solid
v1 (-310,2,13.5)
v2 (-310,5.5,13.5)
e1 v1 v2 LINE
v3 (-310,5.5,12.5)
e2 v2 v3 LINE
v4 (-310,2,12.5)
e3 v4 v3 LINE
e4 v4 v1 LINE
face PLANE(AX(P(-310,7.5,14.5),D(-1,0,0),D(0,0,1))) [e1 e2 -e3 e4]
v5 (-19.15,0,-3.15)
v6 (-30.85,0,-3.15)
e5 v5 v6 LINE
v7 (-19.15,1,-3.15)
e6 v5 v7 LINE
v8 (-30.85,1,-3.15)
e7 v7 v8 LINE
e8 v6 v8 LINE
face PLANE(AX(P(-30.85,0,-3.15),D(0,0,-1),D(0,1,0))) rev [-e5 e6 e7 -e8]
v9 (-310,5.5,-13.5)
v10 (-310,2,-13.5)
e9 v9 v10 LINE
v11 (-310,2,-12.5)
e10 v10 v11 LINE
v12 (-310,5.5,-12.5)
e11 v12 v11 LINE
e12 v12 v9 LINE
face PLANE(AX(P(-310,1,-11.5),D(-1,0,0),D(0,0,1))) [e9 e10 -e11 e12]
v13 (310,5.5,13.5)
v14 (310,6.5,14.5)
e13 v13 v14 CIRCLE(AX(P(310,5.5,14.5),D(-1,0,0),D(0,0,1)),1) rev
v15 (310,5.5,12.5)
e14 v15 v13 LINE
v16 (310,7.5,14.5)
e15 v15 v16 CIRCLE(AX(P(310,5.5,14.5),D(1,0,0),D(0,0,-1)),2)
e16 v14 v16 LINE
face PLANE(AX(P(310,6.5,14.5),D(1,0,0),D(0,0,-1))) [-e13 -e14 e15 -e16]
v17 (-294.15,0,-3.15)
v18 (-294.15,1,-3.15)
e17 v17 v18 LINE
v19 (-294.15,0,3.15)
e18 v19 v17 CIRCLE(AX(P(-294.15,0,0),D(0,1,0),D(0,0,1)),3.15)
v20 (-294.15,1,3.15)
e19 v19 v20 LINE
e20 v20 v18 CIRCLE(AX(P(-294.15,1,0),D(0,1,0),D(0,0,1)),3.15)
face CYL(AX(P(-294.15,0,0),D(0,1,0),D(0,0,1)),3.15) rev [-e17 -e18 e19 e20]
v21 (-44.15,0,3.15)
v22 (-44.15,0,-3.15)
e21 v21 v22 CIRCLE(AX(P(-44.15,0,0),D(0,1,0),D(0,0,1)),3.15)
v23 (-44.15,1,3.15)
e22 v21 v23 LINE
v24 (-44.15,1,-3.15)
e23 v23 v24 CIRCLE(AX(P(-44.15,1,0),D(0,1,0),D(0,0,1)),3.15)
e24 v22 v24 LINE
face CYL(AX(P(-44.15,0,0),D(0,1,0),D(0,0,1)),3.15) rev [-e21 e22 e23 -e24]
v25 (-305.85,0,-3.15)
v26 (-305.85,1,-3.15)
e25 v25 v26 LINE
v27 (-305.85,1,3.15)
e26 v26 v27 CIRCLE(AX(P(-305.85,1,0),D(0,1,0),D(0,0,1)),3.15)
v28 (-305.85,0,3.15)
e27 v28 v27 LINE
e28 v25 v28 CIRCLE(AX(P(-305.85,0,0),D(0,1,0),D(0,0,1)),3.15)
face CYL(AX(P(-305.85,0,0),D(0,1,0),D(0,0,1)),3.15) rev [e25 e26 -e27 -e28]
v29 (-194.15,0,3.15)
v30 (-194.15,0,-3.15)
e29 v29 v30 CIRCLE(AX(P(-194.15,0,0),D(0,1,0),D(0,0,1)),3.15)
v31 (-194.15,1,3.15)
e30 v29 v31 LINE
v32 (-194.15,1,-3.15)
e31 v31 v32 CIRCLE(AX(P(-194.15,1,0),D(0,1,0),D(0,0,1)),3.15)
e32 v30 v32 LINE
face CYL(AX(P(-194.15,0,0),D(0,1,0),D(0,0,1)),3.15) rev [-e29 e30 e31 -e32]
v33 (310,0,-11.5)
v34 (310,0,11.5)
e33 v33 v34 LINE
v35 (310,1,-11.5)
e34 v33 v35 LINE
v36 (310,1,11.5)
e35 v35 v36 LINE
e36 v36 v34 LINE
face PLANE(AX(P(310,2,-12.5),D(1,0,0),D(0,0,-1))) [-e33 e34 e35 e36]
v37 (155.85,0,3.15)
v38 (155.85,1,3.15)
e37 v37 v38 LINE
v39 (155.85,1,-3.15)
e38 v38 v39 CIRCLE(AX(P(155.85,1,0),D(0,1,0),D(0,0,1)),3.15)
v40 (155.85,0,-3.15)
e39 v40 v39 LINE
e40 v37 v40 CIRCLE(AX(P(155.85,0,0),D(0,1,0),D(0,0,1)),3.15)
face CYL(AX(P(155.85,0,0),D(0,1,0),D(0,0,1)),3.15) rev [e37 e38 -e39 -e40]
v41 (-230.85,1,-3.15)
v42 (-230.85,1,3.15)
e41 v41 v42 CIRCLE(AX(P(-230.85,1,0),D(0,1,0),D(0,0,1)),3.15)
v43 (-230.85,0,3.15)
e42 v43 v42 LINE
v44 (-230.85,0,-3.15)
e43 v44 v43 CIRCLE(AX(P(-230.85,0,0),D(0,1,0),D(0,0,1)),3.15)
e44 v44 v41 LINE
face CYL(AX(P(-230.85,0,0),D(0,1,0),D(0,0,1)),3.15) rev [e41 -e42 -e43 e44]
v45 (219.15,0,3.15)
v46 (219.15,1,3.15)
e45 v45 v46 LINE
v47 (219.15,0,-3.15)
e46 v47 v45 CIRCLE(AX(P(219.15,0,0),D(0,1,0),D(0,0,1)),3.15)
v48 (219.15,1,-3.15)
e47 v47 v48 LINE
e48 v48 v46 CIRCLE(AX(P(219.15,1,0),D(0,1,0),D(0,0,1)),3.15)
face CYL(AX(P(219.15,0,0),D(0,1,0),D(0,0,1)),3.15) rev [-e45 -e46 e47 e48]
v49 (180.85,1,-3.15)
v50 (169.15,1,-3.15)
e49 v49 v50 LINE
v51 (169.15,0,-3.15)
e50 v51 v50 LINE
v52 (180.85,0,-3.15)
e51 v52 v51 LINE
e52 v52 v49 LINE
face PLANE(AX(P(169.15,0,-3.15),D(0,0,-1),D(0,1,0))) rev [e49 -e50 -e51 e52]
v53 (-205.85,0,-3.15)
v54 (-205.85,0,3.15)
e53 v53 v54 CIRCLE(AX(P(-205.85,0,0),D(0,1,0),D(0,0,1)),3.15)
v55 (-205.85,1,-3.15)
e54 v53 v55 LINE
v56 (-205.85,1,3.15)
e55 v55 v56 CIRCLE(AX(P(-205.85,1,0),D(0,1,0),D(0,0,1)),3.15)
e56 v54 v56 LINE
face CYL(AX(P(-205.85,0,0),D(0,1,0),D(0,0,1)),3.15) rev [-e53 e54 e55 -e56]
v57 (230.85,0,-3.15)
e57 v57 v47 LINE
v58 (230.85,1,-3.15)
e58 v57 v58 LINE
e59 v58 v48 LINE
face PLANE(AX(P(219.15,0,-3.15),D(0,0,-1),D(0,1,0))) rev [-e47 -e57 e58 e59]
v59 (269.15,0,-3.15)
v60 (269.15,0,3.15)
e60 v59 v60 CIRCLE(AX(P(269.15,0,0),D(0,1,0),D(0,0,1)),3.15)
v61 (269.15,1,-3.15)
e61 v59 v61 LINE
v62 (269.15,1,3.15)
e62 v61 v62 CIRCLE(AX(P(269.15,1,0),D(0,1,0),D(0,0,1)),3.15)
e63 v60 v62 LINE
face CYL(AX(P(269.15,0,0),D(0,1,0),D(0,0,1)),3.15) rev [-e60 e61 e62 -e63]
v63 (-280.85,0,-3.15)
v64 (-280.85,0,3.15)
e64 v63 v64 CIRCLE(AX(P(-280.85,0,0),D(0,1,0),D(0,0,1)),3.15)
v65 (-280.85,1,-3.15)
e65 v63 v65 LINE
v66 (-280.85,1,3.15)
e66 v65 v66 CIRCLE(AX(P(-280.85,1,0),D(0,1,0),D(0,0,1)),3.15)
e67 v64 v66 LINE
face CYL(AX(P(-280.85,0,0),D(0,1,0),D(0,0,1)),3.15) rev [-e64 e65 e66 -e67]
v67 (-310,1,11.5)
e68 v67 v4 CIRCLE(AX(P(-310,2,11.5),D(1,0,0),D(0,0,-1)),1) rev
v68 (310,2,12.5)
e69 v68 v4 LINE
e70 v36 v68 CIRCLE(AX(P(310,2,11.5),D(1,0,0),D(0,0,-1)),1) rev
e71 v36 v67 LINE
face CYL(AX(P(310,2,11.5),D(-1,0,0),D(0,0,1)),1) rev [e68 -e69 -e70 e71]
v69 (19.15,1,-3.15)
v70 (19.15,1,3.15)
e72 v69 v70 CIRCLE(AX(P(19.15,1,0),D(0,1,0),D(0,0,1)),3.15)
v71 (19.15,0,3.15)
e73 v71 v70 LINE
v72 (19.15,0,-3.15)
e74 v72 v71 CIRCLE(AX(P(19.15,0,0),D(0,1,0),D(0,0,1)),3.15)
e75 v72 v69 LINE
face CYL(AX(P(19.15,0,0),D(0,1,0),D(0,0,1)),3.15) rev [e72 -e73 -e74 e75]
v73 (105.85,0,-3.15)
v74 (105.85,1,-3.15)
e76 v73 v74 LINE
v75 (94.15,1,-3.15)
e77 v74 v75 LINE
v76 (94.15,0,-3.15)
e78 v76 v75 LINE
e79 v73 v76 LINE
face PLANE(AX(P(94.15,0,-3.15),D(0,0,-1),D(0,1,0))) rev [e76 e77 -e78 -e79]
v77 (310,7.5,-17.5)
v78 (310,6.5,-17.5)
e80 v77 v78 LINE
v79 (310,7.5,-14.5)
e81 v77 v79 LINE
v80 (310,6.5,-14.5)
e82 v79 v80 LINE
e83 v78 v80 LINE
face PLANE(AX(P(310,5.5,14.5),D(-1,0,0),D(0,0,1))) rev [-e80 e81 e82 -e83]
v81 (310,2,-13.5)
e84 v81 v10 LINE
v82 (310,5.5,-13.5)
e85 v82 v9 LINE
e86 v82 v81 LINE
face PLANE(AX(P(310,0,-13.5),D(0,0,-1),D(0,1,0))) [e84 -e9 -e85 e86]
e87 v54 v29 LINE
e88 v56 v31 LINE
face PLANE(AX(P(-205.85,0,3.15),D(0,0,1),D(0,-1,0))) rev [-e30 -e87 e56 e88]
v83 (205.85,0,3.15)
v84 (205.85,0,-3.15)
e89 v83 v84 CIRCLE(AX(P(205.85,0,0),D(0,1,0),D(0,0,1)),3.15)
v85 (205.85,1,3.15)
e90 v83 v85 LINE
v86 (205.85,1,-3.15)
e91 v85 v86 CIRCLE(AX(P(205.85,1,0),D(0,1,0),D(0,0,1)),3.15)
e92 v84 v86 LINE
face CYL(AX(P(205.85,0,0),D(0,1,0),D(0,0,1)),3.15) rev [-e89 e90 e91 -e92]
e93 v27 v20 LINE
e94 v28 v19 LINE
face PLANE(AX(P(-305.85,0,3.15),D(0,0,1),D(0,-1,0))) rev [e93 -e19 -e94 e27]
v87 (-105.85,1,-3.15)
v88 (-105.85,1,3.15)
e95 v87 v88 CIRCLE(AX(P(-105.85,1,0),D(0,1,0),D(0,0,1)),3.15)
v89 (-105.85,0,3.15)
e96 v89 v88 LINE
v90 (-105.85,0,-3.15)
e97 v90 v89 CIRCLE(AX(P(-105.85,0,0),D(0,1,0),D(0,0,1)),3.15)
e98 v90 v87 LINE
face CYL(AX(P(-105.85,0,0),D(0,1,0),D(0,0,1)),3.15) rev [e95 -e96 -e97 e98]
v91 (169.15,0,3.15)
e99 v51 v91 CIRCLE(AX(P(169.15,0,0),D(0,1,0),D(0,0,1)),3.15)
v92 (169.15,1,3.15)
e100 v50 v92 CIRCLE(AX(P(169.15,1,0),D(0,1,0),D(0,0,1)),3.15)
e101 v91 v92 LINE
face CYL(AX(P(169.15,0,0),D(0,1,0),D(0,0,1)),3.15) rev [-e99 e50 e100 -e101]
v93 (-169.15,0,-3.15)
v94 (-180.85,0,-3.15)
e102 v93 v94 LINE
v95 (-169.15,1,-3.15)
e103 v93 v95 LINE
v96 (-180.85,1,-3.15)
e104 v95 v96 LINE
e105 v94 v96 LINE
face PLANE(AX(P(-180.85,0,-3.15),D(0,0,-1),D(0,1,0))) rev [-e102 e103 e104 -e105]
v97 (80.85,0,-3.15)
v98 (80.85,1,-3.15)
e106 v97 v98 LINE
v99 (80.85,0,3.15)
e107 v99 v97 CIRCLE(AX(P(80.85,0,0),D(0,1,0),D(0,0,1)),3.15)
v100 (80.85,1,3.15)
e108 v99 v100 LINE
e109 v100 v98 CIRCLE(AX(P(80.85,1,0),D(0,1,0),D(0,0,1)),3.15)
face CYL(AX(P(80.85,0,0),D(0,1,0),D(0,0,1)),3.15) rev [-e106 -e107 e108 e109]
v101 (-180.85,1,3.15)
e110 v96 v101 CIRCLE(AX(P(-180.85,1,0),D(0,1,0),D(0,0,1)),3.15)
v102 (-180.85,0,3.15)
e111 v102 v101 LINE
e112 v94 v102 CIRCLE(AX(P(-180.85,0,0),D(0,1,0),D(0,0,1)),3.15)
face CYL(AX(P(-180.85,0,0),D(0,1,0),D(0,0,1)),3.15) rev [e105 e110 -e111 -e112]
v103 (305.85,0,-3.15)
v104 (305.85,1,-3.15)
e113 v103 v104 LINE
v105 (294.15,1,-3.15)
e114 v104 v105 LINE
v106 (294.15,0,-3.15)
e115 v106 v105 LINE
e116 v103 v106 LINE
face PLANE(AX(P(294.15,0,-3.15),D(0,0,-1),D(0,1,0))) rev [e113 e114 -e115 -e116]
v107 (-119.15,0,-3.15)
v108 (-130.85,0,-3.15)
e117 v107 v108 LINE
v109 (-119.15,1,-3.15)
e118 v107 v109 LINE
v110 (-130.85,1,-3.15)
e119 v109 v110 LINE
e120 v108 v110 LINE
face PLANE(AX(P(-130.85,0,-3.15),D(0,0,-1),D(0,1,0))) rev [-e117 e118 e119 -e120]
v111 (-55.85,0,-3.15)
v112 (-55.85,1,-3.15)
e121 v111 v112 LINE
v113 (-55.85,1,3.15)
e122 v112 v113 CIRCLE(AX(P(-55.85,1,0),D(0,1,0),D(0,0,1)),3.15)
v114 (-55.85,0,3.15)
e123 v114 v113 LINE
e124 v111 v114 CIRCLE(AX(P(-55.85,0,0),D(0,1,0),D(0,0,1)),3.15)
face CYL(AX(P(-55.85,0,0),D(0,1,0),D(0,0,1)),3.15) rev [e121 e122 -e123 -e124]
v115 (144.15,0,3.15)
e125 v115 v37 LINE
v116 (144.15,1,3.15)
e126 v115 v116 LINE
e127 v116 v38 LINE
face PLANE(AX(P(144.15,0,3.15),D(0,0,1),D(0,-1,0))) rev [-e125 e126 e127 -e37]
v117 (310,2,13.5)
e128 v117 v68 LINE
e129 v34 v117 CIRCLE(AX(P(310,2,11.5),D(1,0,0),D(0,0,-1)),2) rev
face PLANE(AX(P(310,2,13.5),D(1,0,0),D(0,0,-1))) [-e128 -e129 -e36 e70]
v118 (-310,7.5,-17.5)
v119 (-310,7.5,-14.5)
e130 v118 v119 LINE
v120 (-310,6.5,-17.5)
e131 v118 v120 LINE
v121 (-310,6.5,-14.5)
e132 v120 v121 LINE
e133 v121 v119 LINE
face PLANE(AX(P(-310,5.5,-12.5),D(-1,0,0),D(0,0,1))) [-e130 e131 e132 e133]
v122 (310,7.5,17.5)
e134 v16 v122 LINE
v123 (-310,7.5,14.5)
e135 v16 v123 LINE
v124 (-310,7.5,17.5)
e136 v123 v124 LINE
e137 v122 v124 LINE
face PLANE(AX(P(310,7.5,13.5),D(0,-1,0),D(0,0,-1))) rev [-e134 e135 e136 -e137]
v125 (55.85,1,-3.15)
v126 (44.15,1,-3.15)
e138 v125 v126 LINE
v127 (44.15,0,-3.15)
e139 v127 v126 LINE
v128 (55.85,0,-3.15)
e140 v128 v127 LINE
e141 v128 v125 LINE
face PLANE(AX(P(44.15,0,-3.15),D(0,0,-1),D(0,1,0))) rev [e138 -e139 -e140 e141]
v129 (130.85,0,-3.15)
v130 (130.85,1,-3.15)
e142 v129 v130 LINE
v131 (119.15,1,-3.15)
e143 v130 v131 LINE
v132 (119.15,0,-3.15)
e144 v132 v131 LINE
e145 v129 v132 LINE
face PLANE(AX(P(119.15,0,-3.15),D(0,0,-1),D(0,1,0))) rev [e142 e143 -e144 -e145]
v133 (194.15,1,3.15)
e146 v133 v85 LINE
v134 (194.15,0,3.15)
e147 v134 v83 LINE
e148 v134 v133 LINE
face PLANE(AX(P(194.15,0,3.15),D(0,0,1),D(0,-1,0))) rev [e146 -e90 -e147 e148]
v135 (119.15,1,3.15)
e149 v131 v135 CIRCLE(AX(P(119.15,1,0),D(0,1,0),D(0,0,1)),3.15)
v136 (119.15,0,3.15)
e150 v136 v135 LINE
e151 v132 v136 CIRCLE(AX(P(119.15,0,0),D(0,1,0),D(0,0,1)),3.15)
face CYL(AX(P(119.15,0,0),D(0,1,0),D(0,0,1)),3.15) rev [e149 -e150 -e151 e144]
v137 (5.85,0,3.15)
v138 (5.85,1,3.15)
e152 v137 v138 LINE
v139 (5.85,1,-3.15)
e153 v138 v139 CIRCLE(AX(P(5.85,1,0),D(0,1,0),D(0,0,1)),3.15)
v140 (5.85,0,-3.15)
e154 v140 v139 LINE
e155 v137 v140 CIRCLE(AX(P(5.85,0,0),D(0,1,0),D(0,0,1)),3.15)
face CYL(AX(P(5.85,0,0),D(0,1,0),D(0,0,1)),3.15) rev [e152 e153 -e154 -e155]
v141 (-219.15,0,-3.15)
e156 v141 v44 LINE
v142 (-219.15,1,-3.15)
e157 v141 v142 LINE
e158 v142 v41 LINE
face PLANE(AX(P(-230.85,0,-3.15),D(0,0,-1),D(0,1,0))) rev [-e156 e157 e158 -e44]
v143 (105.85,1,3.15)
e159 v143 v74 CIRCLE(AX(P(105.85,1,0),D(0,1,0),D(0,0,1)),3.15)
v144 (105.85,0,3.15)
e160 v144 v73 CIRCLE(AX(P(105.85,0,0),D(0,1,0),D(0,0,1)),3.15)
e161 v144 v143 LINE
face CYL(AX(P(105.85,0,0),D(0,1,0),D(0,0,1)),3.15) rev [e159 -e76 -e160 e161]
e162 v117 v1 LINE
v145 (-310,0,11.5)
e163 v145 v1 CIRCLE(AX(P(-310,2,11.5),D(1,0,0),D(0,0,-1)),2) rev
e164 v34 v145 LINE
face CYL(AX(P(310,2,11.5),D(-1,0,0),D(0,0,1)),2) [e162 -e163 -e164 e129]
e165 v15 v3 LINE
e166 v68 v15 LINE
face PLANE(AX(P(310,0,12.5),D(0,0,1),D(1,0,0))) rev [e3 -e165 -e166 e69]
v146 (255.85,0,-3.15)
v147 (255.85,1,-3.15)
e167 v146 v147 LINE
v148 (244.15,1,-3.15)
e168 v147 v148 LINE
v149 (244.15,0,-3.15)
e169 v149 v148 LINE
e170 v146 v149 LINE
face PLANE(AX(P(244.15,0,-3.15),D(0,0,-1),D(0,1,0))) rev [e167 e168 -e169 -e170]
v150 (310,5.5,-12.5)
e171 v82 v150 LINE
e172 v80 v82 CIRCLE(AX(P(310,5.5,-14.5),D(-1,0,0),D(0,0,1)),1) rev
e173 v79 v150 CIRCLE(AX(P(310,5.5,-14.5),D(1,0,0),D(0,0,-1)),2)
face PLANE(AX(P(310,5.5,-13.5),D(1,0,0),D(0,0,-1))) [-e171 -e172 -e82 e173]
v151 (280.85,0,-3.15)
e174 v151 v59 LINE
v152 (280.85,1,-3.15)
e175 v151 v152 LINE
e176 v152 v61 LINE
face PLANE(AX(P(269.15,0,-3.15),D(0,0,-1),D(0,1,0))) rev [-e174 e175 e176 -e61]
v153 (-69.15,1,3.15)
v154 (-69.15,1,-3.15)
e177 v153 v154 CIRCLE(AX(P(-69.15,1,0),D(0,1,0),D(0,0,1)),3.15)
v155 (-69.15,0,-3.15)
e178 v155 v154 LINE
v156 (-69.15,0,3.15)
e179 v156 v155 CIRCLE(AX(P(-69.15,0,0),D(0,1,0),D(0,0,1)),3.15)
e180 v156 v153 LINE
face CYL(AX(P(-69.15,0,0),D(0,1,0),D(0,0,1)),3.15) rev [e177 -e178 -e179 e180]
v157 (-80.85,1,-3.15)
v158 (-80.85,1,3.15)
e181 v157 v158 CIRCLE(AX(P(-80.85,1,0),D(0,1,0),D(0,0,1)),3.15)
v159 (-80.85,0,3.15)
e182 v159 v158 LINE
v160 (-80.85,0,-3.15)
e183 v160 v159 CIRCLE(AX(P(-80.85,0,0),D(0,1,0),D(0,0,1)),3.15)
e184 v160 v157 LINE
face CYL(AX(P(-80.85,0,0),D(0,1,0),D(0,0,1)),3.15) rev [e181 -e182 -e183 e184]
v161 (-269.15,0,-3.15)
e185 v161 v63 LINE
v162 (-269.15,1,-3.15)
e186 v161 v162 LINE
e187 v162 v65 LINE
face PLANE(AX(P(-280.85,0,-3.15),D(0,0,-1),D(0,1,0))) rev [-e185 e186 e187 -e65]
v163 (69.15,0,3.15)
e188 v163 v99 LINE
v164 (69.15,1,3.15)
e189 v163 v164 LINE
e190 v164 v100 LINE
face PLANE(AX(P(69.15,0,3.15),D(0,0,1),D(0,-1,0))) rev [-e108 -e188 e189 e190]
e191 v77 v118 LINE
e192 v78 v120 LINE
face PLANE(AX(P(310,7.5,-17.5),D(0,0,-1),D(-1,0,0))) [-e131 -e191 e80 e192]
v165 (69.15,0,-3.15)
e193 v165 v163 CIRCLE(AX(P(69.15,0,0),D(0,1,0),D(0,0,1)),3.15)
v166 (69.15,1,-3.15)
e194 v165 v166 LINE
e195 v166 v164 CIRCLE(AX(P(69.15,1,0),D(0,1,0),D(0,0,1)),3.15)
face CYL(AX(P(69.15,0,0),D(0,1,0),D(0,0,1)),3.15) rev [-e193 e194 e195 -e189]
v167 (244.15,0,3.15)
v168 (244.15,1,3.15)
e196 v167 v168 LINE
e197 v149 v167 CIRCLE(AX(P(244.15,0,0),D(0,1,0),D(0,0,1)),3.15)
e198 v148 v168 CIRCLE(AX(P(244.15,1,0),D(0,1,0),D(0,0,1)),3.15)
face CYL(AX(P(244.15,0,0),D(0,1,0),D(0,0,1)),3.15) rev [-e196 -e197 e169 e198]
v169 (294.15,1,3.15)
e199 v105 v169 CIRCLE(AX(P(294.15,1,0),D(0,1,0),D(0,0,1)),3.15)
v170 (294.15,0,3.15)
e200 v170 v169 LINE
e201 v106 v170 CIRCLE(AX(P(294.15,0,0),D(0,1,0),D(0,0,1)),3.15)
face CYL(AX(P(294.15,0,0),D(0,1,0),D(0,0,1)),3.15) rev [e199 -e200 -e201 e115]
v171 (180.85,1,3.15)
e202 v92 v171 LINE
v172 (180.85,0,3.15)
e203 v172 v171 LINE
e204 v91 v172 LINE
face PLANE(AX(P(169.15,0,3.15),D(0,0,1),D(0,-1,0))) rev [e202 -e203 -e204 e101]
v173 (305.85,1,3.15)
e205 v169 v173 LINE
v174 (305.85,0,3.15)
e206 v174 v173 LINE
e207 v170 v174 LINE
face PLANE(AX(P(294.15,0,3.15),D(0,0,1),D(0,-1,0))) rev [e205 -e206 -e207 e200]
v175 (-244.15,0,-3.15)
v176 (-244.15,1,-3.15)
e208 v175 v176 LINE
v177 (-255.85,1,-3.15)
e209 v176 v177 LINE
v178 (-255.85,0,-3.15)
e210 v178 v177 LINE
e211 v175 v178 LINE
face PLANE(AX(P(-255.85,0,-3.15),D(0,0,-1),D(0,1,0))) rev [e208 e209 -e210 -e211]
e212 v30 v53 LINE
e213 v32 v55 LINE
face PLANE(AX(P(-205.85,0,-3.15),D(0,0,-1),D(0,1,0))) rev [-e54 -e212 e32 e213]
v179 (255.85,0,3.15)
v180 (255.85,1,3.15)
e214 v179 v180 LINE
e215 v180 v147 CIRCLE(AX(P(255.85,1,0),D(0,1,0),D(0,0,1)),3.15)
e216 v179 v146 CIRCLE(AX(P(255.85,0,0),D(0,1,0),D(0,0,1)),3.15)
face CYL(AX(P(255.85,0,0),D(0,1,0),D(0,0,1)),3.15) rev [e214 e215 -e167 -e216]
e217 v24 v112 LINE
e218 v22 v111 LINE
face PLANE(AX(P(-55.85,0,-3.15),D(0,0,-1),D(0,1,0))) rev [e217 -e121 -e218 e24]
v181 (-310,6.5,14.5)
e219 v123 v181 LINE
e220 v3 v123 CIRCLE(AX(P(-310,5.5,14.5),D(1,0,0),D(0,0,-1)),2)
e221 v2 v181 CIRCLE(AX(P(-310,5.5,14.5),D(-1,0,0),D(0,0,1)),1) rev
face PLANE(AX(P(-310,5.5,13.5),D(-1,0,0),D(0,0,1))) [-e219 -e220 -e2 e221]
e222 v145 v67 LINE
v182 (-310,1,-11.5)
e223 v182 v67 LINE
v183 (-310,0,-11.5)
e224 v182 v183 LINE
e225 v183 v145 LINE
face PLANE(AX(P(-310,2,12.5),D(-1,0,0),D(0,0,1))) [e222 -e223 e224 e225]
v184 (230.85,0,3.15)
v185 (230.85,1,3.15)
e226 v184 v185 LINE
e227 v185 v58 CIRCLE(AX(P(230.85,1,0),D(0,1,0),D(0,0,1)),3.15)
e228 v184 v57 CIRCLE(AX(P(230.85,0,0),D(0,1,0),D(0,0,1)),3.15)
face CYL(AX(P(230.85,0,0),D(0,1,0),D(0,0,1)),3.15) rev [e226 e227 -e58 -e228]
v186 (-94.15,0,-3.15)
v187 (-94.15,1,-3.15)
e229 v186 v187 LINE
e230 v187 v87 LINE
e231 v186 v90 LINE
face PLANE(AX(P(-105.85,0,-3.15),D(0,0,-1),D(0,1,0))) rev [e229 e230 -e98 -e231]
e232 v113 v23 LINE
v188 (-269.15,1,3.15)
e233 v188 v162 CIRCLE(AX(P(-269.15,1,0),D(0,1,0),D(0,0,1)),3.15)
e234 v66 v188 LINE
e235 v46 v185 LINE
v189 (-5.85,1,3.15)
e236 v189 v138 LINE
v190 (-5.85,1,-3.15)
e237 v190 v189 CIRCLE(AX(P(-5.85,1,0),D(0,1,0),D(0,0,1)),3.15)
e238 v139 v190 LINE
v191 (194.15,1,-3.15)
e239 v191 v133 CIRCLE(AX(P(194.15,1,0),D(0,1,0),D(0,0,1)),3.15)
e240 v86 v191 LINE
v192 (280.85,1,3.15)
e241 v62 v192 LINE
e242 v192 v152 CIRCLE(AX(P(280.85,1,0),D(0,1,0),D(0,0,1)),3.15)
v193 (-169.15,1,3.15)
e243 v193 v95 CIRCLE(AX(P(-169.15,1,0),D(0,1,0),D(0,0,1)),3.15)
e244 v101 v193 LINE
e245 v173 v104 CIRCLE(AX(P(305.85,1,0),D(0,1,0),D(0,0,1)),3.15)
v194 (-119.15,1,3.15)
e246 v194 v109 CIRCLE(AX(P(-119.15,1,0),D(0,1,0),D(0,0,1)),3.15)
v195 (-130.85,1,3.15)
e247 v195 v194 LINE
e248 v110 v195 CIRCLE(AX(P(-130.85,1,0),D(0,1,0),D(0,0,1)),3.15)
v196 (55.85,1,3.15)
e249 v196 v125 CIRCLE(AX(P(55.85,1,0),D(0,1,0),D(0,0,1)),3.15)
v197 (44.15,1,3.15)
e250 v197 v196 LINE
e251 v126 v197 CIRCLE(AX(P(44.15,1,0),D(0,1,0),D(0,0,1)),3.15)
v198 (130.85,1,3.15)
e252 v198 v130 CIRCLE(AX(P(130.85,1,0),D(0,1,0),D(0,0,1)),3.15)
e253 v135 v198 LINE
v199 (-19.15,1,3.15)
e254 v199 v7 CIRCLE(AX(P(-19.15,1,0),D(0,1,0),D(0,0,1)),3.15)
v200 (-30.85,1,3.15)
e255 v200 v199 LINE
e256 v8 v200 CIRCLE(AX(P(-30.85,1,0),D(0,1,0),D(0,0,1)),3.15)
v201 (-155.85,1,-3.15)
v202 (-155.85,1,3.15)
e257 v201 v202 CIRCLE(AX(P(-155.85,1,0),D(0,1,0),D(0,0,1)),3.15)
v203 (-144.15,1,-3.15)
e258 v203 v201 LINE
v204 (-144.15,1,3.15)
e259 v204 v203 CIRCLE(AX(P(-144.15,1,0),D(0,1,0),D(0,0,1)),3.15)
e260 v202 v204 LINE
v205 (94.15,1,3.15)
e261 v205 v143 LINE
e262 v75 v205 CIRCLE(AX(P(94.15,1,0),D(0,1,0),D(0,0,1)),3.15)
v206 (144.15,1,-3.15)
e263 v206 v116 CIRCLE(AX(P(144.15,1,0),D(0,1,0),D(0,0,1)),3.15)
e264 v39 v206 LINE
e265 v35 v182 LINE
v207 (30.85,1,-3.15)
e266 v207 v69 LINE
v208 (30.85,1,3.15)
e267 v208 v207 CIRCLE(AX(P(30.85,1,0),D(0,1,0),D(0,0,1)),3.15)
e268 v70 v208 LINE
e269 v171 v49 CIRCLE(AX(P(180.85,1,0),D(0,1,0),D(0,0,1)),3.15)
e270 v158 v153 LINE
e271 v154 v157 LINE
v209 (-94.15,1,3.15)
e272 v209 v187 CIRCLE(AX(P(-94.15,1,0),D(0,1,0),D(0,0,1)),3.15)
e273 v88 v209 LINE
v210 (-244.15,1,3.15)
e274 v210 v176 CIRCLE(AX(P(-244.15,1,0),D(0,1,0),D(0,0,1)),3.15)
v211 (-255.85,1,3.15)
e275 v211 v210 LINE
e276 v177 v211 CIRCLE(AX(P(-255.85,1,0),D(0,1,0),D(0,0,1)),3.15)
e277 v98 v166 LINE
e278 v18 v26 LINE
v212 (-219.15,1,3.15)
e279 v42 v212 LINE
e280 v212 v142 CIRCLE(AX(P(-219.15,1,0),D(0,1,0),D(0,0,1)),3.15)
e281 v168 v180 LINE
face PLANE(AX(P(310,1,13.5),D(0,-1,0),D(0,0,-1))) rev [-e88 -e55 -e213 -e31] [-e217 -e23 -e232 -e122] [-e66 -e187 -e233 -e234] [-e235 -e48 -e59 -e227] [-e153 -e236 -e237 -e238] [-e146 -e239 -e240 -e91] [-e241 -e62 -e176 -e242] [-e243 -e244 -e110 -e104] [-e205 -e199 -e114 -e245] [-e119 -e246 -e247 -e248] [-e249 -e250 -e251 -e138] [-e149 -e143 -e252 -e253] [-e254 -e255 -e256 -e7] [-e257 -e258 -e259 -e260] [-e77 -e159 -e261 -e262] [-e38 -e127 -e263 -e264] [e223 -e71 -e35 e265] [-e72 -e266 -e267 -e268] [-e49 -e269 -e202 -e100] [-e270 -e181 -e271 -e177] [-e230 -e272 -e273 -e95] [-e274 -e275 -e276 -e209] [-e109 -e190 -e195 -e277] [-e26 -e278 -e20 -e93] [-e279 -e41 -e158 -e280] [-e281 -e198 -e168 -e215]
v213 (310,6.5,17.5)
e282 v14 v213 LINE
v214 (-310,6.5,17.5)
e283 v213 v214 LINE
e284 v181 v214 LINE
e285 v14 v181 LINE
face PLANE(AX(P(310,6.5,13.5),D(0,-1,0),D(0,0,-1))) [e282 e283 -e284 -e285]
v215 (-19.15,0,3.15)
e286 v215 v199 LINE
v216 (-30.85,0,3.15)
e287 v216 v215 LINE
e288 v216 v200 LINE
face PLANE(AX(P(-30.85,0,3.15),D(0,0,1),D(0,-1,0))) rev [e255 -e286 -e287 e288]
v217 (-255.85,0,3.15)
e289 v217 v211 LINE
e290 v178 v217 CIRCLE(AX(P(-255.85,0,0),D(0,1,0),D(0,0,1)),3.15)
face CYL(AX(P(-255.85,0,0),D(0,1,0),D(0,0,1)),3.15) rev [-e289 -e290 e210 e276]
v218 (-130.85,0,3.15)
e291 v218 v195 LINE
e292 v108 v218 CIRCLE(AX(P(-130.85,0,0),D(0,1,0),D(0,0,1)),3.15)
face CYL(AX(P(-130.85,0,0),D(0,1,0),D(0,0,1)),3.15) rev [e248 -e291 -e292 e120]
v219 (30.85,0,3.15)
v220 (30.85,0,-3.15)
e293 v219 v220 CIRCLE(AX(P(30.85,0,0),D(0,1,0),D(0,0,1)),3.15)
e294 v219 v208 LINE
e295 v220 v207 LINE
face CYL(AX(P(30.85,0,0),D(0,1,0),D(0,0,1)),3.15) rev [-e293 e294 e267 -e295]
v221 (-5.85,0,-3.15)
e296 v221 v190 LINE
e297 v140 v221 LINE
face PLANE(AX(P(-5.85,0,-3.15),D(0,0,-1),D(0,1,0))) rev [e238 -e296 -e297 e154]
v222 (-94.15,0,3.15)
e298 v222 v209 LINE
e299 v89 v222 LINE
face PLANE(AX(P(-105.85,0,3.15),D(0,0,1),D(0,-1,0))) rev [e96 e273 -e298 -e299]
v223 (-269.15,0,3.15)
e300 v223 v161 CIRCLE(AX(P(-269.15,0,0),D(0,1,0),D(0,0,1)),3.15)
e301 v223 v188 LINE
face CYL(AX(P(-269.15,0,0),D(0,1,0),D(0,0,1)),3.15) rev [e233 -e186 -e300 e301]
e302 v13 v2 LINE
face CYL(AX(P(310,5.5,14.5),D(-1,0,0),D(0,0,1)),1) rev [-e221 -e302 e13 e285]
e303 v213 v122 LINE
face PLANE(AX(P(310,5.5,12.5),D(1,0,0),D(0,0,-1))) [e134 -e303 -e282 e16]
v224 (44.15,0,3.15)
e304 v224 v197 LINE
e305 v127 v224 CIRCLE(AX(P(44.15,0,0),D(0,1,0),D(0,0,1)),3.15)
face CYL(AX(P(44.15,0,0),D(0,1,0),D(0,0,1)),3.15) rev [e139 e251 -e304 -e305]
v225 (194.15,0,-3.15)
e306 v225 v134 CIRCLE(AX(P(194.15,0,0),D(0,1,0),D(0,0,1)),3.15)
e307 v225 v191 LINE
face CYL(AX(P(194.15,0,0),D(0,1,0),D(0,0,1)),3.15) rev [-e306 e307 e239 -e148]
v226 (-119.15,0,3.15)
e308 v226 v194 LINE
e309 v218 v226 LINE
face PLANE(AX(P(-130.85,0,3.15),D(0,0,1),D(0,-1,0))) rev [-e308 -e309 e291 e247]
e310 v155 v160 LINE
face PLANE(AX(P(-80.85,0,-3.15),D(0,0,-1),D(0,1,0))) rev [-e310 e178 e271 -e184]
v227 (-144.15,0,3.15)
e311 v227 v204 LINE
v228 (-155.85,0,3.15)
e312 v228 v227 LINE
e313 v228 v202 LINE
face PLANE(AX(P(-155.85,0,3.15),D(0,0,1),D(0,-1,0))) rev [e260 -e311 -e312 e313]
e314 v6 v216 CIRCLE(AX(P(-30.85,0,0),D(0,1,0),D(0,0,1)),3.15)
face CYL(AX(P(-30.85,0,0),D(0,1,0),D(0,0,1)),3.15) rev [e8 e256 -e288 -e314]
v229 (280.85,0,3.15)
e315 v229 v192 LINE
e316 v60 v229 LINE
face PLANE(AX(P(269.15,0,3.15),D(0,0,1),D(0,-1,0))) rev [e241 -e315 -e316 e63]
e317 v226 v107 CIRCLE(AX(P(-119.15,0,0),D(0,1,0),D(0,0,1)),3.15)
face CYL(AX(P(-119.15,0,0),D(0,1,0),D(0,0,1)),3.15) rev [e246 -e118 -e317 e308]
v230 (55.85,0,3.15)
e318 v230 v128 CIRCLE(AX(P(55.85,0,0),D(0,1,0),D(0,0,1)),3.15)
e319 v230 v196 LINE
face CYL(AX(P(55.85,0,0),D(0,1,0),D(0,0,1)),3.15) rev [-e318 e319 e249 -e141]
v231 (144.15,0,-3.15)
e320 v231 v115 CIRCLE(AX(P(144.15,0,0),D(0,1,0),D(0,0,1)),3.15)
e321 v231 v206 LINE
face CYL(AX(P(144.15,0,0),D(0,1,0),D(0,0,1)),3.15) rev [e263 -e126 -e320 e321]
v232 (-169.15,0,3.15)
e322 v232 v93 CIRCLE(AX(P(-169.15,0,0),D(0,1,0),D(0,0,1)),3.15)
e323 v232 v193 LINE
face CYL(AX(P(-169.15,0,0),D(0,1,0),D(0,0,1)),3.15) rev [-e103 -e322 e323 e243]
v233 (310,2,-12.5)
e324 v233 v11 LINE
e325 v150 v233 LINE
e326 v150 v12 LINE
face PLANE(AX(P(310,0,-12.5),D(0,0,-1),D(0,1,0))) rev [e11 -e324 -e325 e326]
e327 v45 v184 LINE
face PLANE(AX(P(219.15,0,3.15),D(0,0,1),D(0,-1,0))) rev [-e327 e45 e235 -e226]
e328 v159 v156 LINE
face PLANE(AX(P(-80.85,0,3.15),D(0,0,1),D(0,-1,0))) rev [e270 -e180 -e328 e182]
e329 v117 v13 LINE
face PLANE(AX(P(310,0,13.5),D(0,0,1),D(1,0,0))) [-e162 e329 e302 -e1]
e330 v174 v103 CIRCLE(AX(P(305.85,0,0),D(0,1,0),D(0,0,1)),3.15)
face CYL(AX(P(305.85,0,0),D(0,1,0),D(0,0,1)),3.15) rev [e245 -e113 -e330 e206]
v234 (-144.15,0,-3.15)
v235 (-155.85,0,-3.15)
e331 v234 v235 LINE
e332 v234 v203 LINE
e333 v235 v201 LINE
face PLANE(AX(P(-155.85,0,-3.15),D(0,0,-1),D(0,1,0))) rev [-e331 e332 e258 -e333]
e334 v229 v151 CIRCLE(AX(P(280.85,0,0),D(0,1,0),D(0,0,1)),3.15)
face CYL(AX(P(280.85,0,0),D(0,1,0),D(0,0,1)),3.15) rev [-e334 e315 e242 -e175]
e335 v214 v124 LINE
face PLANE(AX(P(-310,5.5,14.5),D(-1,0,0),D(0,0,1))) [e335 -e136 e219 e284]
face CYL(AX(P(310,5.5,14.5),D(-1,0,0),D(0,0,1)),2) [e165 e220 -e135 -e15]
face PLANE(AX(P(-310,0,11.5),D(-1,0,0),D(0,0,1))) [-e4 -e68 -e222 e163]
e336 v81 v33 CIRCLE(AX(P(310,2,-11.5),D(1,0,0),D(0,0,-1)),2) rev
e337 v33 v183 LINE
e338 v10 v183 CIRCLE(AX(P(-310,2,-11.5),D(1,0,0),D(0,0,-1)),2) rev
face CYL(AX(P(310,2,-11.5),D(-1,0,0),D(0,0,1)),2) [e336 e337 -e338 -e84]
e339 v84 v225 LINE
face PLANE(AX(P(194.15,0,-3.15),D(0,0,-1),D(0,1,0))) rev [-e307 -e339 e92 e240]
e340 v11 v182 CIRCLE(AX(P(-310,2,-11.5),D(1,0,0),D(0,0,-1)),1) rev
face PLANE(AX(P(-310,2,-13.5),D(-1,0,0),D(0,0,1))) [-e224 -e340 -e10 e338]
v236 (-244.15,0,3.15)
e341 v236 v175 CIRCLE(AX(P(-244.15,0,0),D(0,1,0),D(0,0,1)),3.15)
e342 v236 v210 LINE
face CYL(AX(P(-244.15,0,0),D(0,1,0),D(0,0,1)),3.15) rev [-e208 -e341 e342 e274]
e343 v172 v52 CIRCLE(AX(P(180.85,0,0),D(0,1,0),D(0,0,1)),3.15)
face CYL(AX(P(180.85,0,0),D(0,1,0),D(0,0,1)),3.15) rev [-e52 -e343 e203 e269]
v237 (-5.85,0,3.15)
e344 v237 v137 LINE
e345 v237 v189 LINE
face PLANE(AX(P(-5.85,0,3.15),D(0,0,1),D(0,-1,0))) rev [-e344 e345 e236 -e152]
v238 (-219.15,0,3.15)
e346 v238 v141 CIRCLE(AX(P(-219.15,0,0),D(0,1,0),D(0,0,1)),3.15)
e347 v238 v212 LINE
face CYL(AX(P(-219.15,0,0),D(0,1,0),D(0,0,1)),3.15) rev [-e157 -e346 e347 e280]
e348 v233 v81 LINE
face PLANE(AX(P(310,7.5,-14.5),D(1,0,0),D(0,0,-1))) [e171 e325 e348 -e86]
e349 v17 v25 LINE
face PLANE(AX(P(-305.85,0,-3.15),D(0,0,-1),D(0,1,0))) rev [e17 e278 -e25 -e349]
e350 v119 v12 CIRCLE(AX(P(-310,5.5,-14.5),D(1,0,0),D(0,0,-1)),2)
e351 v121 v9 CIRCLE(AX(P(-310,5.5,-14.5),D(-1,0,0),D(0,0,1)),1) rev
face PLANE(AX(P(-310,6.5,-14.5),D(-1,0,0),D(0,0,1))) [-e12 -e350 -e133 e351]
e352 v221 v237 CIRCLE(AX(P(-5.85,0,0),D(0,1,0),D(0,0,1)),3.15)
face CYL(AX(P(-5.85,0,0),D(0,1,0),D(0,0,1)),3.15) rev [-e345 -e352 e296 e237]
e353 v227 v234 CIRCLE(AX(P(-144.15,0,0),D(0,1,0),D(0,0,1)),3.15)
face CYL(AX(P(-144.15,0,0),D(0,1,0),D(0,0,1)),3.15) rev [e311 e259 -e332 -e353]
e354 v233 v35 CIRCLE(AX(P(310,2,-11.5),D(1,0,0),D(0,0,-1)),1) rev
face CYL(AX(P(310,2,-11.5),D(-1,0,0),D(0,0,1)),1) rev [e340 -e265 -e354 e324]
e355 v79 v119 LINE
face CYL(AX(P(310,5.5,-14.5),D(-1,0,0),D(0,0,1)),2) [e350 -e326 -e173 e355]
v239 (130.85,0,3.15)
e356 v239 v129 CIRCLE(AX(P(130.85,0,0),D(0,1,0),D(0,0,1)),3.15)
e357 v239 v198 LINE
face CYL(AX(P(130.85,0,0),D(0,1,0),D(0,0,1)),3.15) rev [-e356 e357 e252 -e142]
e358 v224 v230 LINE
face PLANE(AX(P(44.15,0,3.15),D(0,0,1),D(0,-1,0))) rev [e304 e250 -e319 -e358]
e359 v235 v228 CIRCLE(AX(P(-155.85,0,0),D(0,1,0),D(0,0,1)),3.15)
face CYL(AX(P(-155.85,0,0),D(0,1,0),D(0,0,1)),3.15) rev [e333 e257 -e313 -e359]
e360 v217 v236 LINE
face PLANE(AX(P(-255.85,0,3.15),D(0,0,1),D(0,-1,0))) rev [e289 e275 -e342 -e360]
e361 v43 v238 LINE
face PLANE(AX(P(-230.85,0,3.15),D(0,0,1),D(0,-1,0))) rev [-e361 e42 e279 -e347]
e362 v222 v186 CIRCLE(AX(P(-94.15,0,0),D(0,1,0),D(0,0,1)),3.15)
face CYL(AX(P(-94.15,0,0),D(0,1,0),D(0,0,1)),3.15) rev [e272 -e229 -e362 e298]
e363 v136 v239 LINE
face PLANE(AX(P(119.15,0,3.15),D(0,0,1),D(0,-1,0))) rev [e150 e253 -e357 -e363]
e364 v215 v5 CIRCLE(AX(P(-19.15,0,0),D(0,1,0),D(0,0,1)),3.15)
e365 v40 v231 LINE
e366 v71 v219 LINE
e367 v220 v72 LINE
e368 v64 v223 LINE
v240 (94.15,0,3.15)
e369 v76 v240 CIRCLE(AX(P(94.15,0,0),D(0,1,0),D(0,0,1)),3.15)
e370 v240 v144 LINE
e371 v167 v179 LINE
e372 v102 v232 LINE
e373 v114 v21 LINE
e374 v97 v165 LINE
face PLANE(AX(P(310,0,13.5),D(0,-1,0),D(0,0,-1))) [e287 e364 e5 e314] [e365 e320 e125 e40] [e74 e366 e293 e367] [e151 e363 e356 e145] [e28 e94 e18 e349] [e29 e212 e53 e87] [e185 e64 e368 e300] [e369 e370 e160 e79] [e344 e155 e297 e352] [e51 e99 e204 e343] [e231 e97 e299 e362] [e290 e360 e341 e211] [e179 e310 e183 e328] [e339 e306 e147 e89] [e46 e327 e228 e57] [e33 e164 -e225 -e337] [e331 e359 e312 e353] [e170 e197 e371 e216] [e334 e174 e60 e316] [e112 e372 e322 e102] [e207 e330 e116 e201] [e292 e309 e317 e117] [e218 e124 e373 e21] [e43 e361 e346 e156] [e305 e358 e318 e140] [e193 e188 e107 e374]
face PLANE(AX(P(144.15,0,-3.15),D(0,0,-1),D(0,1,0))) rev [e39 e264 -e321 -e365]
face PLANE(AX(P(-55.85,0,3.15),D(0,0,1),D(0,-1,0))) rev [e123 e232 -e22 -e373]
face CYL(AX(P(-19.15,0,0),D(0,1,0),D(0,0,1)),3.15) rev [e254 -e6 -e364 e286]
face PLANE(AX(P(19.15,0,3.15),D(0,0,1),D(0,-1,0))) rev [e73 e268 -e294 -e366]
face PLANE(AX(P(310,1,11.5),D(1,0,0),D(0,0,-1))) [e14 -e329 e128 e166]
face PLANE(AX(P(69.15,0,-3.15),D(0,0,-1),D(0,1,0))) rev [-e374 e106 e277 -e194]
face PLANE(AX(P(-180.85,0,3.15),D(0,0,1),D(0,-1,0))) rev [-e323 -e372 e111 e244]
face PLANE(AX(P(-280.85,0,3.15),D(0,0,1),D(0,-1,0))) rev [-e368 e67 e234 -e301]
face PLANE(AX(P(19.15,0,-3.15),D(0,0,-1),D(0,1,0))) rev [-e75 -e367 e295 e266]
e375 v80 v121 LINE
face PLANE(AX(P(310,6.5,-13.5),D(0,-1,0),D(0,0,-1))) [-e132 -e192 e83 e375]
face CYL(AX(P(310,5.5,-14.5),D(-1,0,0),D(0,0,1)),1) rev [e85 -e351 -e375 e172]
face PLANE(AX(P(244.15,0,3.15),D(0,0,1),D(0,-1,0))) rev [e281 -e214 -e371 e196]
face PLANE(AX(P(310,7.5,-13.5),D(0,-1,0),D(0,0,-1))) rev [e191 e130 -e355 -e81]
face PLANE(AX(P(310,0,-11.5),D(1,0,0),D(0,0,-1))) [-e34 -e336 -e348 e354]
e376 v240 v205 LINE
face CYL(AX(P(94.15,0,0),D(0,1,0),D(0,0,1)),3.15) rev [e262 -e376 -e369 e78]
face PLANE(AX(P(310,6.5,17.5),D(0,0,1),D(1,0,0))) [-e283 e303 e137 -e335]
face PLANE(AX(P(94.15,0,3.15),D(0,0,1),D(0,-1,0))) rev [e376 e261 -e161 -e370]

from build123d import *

# Parameters (mm, degrees)
BASE_FLANGE1_DEPTH         = 310
EXTRUDE_CUT_DEPTH          = 311.561588095
LINEAR_PATTERN_1_COUNT     = 13
LINEAR_PATTERN_1_PITCH     = 25
LINEAR_PATTERN_1_COL_COUNT = 13
LINEAR_PATTERN_1_COL_PITCH = 25


# Sheet-metal steps are written as plain solids
with BuildPart() as part:
    # Sketch2 → Base-Flange1 (new, symmetric)
    with BuildSketch(Plane(origin=(0, 0, 0), x_dir=(0, 0, -1), z_dir=(1, 0, 0))):
        with BuildLine():
            Line((-17.5, 6.5), (-14.5, 6.5))
            ThreePointArc((-14.5, 6.5), (-13.792893219, 6.207106781), (-13.5, 5.5))
            Line((-13.5, 5.5), (-13.5, 2))
            ThreePointArc((-13.5, 2), (-12.914213562, 0.585786438), (-11.5, 0))
            Line((-11.5, 0), (11.5, 0))
            ThreePointArc((11.5, 0), (12.914213562, 0.585786438), (13.5, 2))
            Line((13.5, 2), (13.5, 5.5))
            ThreePointArc((13.5, 5.5), (13.792893219, 6.207106781), (14.5, 6.5))
            Line((14.5, 6.5), (17.5, 6.5))
            Line((17.5, 6.5), (17.5, 7.5))
            Line((17.5, 7.5), (14.5, 7.5))
            ThreePointArc((14.5, 7.5), (13.085786438, 6.914213562), (12.5, 5.5))
            Line((12.5, 5.5), (12.5, 2))
            ThreePointArc((12.5, 2), (12.207106781, 1.292893219), (11.5, 1))
            Line((11.5, 1), (-11.5, 1))
            ThreePointArc((-11.5, 1), (-12.207106781, 1.292893219), (-12.5, 2))
            Line((-12.5, 2), (-12.5, 5.5))
            ThreePointArc((-12.5, 5.5), (-13.085786438, 6.914213562), (-14.5, 7.5))
            Line((-14.5, 7.5), (-17.5, 7.5))
            Line((-17.5, 7.5), (-17.5, 6.5))
        make_face()
    extrude(amount=BASE_FLANGE1_DEPTH, both=True)

    # Sketch1 → Extrude Cut (cut, through all)
    with BuildSketch(Plane(origin=(0, 1, 0), x_dir=(1, 0, 0), z_dir=(0, 1, 0))):
        with BuildLine():
            Line((-5.85, 3.15), (5.85, 3.15))
            ThreePointArc((5.85, 3.15), (9, 0), (5.85, -3.15))
            Line((5.85, -3.15), (-5.85, -3.15))
            ThreePointArc((-5.85, -3.15), (-9, 0), (-5.85, 3.15))
        make_face()
    extrude_cut = extrude(amount=-EXTRUDE_CUT_DEPTH, mode=Mode.SUBTRACT)

    # Linear Pattern 1: Extrude Cut ×13
    with Locations(*[(i * LINEAR_PATTERN_1_PITCH, 0, 0) for i in range(1, LINEAR_PATTERN_1_COUNT)]):
        add(extrude_cut, mode=Mode.SUBTRACT)

    # Linear Pattern 1 col: Extrude Cut ×13
    with Locations(*[(-i * LINEAR_PATTERN_1_COL_PITCH, 0, 0) for i in range(1, LINEAR_PATTERN_1_COL_COUNT)]):
        add(extrude_cut, mode=Mode.SUBTRACT)


solid = part.part
